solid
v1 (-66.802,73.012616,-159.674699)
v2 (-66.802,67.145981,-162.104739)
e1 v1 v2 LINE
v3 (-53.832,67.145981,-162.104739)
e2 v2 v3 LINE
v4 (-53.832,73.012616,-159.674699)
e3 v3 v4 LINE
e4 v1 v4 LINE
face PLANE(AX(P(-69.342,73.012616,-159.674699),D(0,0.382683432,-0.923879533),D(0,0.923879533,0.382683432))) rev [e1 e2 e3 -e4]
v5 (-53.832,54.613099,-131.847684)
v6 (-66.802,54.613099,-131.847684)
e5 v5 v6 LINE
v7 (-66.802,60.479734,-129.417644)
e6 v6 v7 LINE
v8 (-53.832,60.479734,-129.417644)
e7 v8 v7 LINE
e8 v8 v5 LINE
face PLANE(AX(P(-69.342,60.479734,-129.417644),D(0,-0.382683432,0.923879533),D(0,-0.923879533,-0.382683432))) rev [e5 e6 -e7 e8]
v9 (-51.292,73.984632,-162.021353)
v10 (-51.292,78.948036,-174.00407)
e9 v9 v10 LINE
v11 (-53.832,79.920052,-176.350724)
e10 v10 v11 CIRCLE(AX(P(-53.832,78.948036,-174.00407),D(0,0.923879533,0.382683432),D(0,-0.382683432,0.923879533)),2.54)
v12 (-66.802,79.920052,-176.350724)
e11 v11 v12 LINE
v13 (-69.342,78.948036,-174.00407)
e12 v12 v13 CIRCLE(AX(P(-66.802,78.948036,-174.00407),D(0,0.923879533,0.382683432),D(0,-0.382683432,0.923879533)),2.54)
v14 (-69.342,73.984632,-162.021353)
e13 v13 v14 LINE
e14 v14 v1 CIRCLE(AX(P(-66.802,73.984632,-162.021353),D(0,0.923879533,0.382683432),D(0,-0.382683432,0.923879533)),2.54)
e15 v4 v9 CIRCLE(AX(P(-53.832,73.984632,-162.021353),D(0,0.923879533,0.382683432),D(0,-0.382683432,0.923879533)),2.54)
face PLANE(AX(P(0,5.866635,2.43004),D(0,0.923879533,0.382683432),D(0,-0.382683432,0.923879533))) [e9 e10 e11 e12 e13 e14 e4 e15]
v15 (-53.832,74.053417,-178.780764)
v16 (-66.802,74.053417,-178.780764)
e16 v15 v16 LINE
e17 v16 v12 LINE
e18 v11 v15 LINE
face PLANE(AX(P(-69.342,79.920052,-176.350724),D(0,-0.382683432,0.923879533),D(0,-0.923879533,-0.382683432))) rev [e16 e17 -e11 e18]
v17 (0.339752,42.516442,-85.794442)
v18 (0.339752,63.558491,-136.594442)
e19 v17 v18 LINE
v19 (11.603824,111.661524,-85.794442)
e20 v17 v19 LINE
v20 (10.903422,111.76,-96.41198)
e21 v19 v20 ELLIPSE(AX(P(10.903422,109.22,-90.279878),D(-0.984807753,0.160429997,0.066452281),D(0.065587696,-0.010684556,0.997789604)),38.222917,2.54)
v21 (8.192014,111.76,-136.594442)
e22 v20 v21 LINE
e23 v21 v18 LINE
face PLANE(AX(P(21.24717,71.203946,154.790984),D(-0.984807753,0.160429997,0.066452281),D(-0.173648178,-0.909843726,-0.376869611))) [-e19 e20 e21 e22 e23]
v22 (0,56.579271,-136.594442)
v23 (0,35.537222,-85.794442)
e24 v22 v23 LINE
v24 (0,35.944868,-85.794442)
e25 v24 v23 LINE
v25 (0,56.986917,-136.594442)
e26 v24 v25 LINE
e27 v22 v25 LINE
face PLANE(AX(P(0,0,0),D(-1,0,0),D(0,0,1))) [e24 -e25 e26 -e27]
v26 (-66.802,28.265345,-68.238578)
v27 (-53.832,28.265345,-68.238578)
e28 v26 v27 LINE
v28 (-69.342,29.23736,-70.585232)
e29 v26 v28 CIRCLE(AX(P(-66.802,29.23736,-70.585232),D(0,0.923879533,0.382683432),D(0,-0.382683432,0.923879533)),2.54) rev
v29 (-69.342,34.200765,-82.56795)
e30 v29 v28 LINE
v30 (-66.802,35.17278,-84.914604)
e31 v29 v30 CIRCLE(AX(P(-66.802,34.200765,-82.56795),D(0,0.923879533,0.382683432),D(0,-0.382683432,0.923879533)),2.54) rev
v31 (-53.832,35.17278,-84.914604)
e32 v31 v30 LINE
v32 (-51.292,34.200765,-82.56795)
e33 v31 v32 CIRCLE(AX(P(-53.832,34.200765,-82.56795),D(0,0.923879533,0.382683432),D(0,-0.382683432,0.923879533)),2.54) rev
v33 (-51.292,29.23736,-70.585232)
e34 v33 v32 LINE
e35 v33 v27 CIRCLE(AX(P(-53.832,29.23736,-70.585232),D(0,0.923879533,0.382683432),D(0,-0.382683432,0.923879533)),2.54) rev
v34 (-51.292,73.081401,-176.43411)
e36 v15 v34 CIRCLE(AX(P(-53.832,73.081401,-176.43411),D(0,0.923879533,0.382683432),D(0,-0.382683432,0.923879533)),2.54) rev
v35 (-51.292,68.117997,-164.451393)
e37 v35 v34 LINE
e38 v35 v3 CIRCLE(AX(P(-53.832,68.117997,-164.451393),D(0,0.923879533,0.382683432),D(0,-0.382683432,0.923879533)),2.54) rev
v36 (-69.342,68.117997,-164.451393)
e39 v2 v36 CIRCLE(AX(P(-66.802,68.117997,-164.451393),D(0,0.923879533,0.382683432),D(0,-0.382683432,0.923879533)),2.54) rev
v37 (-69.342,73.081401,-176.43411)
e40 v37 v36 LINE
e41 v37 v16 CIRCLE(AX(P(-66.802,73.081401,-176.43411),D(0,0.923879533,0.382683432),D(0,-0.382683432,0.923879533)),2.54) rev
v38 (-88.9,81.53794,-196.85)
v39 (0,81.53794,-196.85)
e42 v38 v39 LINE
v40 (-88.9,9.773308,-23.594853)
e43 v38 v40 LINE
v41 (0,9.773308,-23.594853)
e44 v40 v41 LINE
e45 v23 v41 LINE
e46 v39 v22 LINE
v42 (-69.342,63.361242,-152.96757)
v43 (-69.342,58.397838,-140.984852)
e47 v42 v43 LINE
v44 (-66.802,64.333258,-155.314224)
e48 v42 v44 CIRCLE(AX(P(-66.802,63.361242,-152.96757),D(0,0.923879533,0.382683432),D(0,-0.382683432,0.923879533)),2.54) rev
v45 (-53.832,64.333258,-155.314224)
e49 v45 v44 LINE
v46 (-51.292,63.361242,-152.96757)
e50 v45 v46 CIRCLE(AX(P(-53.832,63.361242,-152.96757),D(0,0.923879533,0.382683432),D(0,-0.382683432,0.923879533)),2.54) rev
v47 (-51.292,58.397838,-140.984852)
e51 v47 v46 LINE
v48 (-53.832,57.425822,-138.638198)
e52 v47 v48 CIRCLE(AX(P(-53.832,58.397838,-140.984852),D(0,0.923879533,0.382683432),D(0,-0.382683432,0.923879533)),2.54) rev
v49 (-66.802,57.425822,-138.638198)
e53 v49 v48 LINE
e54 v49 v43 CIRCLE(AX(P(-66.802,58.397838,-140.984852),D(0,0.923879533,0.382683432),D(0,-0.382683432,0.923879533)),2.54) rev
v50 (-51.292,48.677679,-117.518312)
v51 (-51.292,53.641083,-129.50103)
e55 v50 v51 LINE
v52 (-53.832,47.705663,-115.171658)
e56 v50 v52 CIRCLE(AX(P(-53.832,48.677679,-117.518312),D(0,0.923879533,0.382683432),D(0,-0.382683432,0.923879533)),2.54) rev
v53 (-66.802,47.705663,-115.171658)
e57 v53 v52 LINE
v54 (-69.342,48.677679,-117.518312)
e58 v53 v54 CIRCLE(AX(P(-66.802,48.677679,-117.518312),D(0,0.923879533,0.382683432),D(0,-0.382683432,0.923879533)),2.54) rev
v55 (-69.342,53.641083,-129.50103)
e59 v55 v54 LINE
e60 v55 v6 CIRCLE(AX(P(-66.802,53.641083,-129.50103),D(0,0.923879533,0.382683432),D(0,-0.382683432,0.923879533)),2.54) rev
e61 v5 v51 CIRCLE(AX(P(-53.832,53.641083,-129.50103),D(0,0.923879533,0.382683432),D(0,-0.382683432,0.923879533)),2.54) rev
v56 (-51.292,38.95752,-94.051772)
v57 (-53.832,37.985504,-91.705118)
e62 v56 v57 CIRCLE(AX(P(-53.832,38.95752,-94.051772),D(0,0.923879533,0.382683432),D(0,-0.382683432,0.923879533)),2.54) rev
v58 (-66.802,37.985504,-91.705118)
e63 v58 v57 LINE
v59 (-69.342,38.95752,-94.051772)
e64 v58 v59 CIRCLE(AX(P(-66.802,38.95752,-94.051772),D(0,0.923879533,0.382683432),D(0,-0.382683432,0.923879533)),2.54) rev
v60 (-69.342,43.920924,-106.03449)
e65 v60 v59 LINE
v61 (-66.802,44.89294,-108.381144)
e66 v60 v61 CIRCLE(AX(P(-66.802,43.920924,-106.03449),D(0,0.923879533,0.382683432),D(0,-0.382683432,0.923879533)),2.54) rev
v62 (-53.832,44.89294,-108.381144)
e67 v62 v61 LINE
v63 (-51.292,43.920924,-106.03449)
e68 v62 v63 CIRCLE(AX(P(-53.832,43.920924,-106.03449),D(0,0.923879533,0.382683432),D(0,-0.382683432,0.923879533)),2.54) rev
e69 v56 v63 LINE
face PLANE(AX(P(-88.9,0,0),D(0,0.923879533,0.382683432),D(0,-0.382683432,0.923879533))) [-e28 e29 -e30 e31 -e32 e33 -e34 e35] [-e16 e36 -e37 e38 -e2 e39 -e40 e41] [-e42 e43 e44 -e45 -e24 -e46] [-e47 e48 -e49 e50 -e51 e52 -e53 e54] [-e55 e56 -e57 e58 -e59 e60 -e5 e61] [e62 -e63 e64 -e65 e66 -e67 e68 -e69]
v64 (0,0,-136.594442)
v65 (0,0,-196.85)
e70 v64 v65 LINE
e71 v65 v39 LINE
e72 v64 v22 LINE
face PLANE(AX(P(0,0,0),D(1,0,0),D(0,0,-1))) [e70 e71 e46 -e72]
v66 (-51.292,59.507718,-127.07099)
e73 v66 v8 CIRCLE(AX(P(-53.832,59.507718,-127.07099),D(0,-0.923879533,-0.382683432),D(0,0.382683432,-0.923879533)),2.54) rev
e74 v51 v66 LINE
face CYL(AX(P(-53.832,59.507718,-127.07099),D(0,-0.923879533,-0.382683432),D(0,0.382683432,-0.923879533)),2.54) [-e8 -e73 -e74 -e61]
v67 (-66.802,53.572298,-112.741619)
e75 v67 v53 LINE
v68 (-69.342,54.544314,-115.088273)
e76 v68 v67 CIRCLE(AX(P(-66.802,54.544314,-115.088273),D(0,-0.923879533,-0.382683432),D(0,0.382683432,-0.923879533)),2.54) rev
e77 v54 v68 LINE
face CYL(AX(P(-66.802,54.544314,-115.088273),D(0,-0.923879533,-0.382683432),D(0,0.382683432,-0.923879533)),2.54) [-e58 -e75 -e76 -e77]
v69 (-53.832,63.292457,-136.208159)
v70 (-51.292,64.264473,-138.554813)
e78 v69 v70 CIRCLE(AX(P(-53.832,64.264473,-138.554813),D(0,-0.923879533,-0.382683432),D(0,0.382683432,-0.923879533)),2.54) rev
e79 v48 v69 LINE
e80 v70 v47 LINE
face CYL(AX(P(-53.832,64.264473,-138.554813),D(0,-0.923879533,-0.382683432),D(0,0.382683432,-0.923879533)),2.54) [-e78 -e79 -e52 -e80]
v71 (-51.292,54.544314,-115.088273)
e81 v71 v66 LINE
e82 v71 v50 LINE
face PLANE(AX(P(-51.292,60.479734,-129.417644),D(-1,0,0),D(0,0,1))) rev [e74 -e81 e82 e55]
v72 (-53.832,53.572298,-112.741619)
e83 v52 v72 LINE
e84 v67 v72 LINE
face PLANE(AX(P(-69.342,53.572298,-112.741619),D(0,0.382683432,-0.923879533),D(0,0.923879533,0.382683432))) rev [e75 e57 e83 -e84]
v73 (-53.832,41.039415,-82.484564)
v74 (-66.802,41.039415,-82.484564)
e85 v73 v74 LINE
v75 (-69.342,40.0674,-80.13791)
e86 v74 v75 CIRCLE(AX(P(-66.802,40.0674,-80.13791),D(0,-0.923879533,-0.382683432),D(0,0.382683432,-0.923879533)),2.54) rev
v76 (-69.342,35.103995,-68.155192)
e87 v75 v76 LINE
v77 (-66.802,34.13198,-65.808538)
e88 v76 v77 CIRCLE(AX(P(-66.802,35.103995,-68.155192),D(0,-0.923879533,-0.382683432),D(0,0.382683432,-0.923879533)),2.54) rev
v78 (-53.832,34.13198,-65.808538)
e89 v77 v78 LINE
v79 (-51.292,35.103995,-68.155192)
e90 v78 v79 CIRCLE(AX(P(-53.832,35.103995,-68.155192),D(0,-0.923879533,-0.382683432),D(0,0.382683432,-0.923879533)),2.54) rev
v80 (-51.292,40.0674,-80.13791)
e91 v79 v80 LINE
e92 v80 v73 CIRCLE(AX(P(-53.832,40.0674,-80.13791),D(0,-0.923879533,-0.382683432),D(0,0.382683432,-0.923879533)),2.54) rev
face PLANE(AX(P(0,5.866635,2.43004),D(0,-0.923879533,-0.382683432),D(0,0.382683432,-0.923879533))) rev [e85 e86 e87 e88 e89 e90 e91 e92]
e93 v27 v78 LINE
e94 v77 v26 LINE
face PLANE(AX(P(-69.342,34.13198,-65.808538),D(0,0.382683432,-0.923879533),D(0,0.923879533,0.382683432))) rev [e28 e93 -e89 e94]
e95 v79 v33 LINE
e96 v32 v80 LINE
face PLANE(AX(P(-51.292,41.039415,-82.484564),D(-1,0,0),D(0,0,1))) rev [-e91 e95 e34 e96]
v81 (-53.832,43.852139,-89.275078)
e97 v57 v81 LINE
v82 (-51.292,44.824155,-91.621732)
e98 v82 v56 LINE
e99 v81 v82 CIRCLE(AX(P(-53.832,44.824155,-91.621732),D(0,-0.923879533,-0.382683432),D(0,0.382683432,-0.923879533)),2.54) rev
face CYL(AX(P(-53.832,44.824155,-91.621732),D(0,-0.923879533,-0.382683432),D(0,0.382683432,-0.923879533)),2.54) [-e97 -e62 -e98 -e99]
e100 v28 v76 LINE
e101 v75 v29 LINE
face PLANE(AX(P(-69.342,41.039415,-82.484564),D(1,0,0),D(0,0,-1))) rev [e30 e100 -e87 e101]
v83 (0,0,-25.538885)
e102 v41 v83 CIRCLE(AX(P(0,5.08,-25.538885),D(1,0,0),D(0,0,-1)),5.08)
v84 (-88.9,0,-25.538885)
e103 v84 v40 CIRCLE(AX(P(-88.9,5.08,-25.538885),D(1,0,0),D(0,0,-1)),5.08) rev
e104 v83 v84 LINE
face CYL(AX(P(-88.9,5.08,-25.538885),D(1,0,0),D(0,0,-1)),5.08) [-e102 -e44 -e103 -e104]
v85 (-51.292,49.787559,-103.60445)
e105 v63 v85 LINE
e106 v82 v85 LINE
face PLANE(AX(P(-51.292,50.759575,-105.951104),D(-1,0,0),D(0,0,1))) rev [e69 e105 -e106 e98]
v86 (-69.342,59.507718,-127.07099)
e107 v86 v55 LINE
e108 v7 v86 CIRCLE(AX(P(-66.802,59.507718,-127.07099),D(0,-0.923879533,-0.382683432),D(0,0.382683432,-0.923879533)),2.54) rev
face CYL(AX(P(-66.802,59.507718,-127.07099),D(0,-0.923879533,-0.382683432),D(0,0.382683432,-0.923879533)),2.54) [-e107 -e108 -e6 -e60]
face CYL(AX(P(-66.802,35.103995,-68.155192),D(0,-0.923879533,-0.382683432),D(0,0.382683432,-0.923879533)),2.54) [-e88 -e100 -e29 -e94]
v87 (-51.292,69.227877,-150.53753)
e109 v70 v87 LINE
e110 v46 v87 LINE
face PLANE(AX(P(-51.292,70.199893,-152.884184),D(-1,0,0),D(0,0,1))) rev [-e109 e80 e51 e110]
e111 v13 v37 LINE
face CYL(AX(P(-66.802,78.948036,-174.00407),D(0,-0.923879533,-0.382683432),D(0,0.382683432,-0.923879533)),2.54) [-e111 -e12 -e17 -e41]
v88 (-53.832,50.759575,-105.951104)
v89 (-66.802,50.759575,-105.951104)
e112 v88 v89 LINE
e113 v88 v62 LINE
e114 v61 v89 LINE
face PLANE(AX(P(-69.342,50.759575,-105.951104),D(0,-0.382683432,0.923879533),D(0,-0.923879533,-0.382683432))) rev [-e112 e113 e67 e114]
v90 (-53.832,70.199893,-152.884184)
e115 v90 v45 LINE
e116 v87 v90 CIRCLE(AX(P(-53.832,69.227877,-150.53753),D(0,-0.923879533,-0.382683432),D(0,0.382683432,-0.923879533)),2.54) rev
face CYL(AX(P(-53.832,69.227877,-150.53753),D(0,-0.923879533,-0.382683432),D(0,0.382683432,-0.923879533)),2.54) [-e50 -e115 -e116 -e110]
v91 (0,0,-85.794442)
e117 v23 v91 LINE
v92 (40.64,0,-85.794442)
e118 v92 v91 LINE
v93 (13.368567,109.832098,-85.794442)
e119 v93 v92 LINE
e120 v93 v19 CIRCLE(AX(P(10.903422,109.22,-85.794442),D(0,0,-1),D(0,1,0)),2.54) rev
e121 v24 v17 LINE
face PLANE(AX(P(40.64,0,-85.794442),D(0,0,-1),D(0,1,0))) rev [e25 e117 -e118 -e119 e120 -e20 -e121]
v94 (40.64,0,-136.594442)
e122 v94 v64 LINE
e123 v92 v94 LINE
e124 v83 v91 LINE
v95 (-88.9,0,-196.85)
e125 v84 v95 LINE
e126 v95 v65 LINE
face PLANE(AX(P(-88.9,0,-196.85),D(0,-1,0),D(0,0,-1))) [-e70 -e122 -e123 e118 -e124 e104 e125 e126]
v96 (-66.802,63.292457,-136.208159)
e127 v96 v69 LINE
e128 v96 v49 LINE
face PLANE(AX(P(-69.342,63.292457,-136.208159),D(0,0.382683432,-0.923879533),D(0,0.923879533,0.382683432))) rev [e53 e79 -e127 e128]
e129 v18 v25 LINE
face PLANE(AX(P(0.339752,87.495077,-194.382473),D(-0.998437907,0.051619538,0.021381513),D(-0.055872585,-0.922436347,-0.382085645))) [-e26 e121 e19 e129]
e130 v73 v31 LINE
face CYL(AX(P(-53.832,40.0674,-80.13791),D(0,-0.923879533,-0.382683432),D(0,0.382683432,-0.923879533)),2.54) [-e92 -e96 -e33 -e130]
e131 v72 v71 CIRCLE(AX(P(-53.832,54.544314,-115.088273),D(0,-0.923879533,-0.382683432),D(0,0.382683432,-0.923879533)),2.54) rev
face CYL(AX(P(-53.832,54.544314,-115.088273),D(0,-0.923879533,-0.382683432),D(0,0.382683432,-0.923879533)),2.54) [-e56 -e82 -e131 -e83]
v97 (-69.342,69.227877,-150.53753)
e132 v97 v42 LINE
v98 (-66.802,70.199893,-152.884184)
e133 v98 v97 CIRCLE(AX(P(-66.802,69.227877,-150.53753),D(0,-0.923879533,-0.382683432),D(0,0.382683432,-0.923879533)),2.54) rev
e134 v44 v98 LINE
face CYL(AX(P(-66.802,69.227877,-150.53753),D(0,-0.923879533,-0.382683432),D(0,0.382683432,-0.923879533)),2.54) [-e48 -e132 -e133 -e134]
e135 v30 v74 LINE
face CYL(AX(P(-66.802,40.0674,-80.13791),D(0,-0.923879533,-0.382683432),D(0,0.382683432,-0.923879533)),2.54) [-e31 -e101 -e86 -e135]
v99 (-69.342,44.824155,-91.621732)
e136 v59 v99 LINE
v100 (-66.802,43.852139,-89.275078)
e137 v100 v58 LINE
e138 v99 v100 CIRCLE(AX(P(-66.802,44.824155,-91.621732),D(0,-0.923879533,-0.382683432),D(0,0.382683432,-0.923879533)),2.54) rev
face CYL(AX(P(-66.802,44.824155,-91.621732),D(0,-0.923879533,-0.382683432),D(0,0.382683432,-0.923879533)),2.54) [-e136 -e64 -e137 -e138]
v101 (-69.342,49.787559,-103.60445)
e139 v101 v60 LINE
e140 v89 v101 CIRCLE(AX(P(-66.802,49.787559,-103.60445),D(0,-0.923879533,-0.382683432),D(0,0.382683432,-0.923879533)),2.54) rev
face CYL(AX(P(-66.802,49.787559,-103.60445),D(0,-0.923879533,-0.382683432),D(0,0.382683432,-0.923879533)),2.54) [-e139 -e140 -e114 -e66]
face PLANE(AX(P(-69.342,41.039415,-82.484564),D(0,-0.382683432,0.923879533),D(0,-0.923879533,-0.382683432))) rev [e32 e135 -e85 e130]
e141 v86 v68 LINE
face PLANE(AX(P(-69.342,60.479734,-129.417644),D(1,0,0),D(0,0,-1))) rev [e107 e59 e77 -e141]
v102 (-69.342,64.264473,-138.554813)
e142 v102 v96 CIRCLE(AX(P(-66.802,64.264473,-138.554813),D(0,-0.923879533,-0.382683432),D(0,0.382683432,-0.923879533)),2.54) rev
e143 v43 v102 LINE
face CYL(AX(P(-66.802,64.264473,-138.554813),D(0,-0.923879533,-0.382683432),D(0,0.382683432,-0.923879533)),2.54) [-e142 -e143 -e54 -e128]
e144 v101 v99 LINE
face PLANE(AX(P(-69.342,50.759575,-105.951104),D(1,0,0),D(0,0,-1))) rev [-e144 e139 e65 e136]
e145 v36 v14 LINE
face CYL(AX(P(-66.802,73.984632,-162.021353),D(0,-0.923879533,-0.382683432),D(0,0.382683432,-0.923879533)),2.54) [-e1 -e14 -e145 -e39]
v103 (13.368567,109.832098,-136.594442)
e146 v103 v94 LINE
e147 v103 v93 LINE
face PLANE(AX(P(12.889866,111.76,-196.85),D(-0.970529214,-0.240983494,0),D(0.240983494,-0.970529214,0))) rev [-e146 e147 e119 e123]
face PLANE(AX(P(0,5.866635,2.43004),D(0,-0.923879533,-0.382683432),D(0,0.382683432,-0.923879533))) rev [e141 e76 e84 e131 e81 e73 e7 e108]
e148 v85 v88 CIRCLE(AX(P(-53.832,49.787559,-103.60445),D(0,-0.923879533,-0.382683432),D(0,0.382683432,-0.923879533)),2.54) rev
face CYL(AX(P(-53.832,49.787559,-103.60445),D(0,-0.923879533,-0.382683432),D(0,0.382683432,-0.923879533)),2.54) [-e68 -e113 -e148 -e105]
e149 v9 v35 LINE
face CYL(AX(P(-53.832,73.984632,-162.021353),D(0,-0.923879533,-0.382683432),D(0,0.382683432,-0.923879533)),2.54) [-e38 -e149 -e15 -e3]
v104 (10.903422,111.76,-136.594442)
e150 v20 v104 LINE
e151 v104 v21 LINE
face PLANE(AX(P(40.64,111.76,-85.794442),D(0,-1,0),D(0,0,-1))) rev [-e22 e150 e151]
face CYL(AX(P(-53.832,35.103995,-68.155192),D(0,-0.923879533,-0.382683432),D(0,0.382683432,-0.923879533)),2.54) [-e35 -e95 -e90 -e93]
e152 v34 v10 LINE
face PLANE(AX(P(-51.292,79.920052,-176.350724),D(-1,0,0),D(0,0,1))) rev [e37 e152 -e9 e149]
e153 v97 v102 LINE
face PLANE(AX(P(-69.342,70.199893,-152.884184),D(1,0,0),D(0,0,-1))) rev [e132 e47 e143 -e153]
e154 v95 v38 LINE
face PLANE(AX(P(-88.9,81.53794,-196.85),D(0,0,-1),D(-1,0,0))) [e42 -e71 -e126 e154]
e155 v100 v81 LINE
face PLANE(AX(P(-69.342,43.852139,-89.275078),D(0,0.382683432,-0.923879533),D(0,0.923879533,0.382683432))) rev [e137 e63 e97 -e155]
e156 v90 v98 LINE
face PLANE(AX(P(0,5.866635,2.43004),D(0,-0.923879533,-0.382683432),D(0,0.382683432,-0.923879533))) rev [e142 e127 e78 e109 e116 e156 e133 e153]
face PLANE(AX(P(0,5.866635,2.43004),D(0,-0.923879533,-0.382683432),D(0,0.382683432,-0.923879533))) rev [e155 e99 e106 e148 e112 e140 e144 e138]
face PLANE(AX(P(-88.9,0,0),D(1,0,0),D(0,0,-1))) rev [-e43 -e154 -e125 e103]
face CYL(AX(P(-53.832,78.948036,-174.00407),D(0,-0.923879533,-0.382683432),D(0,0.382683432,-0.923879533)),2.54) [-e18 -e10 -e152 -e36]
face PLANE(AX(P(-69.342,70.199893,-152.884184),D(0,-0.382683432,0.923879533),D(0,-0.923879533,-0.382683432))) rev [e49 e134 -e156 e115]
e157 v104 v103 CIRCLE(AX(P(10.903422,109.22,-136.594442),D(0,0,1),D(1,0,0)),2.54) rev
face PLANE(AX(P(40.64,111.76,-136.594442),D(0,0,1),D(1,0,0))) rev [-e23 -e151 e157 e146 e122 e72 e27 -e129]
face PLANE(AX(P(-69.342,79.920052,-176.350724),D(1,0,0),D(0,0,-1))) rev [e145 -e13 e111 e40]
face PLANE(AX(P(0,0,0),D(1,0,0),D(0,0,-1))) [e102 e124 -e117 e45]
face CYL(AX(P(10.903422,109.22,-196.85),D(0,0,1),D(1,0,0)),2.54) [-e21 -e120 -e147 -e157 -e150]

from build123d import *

# Parameters (mm, degrees)
BOSS_EXTRUDE1_DEPTH = 88.9
SKETCH3_W           = 18.049999968
SKETCH3_H           = 18.049999968
BOSS_EXTRUDE2_DEPTH = 6.35
FILLET1_R           = 2.54
FILLET2_R           = 5.08
BOSS_EXTRUDE3_DEPTH = 40.64
CAVITY1_START       = 93.019234599
CAVITY1_DEPTH       = 75.946275307
CUT_EXTRUDE1_DEPTH  = 181.905623168
FILLET3_R           = 2.54


# Read off the part's stored shape, not the designer's step: Cavity1
with BuildPart() as part:
    # Sketch2 → Boss-Extrude1 (new body)
    with BuildSketch(Plane(origin=(0, 0, 0), x_dir=(0, 0, -1), z_dir=(1, 0, 0))):
        Polygon((0, 0), (196.85, 81.537939753), (196.85, 0), align=None)
    extrude(amount=-BOSS_EXTRUDE1_DEPTH)

    # Sketch3 → Boss-Extrude2 (add)
    with BuildSketch(Plane(origin=(0, 0, 0), x_dir=(1, 0, 0), z_dir=(0, 0.9238795325112891, 0.3826834323650843))):
        with Locations((-60.317000016, 184.485904644)):
            Rectangle(SKETCH3_W, SKETCH3_H)
        with Locations((-60.317000016, 159.085904644)):
            Rectangle(SKETCH3_W, SKETCH3_H)
        with Locations((-60.317000016, 133.685904644)):
            Rectangle(SKETCH3_W, SKETCH3_H)
        with Locations((-60.317000016, 108.285904644)):
            Rectangle(SKETCH3_W, SKETCH3_H)
        with Locations((-60.317000016, 82.885904644)):
            Rectangle(SKETCH3_W, SKETCH3_H)
    extrude(amount=BOSS_EXTRUDE2_DEPTH)

    # Fillet1
    fillet1_edges = [part.edges().sort_by_distance(p)[0] for p in [
        (-69.342, 76.986734699, -177.565744205),
        (-69.342, 70.079298757, -160.889718673),
        (-51.292000032, 70.079298757, -160.889718673),
        (-51.292000032, 76.986734699, -177.565744205),
        (-51.292000032, 67.266575517, -154.09920408),
        (-69.342, 67.266575517, -154.09920408),
        (-69.342, 60.359139575, -137.423178547),
        (-51.292000032, 60.359139575, -137.423178547),
        (-51.292000032, 57.546416335, -130.632663954),
        (-69.342, 57.546416335, -130.632663954),
        (-69.342, 50.638980393, -113.956638422),
        (-51.292000032, 50.638980393, -113.956638422),
        (-51.292000032, 47.826257152, -107.166123828),
        (-69.342, 47.826257152, -107.166123828),
        (-69.342, 40.918821211, -90.490098296),
        (-51.292000032, 40.918821211, -90.490098296),
        (-51.292000032, 38.10609797, -83.699583702),
        (-69.342, 38.10609797, -83.699583702),
        (-69.342, 31.198662028, -67.02355817),
        (-51.292000032, 31.198662028, -67.02355817),
    ]]
    fillet(fillet1_edges, radius=FILLET1_R)

    # Fillet2
    fillet2_edges = [part.edges().sort_by_distance(p)[0] for p in [
        (-44.45, 0, 0),
    ]]
    fillet(fillet2_edges, radius=FILLET2_R)

    # Sketch4 → Boss-Extrude3 (add)
    with BuildSketch(Plane(origin=(0, 0, 0), x_dir=(0, 0, -1), z_dir=(1, 0, 0))):
        Polygon((111.19444231, 0), (85.79444231, 0), (85.79444231, 111.76), (136.59444231, 111.76), (136.59444231, 0), align=None)
    extrude(amount=BOSS_EXTRUDE3_DEPTH)

    # Cavity1 outline → Cavity1 (cut)
    with BuildSketch(Plane(origin=(0, 0, 0), x_dir=(1, 0, 0), z_dir=(0, 0.38268343236508323, -0.9238795325112895)).offset(CAVITY1_START)):
        Polygon((0.339752359, -6.447958985), (0, -0.376615902), (0, -72), (11.89834583, -72), (11.619866439, -70.420664892), align=None)
    extrude(amount=CAVITY1_DEPTH, mode=Mode.SUBTRACT)

    # Sketch8 → Cut-Extrude1 (cut, through all)
    with BuildSketch(Plane.XY.offset(-85.79444231)):
        Polygon((12.889866439, 111.76), (40.64, 0), (40.64, 111.76), align=None)
    extrude(amount=-CUT_EXTRUDE1_DEPTH, mode=Mode.SUBTRACT)

    # Fillet3
    fillet3_edges = [part.edges().sort_by_distance(p)[0] for p in [
        (12.889866439, 111.76, -111.19444231),
    ]]
    fillet(fillet3_edges, radius=FILLET3_R)


solid = part.part
